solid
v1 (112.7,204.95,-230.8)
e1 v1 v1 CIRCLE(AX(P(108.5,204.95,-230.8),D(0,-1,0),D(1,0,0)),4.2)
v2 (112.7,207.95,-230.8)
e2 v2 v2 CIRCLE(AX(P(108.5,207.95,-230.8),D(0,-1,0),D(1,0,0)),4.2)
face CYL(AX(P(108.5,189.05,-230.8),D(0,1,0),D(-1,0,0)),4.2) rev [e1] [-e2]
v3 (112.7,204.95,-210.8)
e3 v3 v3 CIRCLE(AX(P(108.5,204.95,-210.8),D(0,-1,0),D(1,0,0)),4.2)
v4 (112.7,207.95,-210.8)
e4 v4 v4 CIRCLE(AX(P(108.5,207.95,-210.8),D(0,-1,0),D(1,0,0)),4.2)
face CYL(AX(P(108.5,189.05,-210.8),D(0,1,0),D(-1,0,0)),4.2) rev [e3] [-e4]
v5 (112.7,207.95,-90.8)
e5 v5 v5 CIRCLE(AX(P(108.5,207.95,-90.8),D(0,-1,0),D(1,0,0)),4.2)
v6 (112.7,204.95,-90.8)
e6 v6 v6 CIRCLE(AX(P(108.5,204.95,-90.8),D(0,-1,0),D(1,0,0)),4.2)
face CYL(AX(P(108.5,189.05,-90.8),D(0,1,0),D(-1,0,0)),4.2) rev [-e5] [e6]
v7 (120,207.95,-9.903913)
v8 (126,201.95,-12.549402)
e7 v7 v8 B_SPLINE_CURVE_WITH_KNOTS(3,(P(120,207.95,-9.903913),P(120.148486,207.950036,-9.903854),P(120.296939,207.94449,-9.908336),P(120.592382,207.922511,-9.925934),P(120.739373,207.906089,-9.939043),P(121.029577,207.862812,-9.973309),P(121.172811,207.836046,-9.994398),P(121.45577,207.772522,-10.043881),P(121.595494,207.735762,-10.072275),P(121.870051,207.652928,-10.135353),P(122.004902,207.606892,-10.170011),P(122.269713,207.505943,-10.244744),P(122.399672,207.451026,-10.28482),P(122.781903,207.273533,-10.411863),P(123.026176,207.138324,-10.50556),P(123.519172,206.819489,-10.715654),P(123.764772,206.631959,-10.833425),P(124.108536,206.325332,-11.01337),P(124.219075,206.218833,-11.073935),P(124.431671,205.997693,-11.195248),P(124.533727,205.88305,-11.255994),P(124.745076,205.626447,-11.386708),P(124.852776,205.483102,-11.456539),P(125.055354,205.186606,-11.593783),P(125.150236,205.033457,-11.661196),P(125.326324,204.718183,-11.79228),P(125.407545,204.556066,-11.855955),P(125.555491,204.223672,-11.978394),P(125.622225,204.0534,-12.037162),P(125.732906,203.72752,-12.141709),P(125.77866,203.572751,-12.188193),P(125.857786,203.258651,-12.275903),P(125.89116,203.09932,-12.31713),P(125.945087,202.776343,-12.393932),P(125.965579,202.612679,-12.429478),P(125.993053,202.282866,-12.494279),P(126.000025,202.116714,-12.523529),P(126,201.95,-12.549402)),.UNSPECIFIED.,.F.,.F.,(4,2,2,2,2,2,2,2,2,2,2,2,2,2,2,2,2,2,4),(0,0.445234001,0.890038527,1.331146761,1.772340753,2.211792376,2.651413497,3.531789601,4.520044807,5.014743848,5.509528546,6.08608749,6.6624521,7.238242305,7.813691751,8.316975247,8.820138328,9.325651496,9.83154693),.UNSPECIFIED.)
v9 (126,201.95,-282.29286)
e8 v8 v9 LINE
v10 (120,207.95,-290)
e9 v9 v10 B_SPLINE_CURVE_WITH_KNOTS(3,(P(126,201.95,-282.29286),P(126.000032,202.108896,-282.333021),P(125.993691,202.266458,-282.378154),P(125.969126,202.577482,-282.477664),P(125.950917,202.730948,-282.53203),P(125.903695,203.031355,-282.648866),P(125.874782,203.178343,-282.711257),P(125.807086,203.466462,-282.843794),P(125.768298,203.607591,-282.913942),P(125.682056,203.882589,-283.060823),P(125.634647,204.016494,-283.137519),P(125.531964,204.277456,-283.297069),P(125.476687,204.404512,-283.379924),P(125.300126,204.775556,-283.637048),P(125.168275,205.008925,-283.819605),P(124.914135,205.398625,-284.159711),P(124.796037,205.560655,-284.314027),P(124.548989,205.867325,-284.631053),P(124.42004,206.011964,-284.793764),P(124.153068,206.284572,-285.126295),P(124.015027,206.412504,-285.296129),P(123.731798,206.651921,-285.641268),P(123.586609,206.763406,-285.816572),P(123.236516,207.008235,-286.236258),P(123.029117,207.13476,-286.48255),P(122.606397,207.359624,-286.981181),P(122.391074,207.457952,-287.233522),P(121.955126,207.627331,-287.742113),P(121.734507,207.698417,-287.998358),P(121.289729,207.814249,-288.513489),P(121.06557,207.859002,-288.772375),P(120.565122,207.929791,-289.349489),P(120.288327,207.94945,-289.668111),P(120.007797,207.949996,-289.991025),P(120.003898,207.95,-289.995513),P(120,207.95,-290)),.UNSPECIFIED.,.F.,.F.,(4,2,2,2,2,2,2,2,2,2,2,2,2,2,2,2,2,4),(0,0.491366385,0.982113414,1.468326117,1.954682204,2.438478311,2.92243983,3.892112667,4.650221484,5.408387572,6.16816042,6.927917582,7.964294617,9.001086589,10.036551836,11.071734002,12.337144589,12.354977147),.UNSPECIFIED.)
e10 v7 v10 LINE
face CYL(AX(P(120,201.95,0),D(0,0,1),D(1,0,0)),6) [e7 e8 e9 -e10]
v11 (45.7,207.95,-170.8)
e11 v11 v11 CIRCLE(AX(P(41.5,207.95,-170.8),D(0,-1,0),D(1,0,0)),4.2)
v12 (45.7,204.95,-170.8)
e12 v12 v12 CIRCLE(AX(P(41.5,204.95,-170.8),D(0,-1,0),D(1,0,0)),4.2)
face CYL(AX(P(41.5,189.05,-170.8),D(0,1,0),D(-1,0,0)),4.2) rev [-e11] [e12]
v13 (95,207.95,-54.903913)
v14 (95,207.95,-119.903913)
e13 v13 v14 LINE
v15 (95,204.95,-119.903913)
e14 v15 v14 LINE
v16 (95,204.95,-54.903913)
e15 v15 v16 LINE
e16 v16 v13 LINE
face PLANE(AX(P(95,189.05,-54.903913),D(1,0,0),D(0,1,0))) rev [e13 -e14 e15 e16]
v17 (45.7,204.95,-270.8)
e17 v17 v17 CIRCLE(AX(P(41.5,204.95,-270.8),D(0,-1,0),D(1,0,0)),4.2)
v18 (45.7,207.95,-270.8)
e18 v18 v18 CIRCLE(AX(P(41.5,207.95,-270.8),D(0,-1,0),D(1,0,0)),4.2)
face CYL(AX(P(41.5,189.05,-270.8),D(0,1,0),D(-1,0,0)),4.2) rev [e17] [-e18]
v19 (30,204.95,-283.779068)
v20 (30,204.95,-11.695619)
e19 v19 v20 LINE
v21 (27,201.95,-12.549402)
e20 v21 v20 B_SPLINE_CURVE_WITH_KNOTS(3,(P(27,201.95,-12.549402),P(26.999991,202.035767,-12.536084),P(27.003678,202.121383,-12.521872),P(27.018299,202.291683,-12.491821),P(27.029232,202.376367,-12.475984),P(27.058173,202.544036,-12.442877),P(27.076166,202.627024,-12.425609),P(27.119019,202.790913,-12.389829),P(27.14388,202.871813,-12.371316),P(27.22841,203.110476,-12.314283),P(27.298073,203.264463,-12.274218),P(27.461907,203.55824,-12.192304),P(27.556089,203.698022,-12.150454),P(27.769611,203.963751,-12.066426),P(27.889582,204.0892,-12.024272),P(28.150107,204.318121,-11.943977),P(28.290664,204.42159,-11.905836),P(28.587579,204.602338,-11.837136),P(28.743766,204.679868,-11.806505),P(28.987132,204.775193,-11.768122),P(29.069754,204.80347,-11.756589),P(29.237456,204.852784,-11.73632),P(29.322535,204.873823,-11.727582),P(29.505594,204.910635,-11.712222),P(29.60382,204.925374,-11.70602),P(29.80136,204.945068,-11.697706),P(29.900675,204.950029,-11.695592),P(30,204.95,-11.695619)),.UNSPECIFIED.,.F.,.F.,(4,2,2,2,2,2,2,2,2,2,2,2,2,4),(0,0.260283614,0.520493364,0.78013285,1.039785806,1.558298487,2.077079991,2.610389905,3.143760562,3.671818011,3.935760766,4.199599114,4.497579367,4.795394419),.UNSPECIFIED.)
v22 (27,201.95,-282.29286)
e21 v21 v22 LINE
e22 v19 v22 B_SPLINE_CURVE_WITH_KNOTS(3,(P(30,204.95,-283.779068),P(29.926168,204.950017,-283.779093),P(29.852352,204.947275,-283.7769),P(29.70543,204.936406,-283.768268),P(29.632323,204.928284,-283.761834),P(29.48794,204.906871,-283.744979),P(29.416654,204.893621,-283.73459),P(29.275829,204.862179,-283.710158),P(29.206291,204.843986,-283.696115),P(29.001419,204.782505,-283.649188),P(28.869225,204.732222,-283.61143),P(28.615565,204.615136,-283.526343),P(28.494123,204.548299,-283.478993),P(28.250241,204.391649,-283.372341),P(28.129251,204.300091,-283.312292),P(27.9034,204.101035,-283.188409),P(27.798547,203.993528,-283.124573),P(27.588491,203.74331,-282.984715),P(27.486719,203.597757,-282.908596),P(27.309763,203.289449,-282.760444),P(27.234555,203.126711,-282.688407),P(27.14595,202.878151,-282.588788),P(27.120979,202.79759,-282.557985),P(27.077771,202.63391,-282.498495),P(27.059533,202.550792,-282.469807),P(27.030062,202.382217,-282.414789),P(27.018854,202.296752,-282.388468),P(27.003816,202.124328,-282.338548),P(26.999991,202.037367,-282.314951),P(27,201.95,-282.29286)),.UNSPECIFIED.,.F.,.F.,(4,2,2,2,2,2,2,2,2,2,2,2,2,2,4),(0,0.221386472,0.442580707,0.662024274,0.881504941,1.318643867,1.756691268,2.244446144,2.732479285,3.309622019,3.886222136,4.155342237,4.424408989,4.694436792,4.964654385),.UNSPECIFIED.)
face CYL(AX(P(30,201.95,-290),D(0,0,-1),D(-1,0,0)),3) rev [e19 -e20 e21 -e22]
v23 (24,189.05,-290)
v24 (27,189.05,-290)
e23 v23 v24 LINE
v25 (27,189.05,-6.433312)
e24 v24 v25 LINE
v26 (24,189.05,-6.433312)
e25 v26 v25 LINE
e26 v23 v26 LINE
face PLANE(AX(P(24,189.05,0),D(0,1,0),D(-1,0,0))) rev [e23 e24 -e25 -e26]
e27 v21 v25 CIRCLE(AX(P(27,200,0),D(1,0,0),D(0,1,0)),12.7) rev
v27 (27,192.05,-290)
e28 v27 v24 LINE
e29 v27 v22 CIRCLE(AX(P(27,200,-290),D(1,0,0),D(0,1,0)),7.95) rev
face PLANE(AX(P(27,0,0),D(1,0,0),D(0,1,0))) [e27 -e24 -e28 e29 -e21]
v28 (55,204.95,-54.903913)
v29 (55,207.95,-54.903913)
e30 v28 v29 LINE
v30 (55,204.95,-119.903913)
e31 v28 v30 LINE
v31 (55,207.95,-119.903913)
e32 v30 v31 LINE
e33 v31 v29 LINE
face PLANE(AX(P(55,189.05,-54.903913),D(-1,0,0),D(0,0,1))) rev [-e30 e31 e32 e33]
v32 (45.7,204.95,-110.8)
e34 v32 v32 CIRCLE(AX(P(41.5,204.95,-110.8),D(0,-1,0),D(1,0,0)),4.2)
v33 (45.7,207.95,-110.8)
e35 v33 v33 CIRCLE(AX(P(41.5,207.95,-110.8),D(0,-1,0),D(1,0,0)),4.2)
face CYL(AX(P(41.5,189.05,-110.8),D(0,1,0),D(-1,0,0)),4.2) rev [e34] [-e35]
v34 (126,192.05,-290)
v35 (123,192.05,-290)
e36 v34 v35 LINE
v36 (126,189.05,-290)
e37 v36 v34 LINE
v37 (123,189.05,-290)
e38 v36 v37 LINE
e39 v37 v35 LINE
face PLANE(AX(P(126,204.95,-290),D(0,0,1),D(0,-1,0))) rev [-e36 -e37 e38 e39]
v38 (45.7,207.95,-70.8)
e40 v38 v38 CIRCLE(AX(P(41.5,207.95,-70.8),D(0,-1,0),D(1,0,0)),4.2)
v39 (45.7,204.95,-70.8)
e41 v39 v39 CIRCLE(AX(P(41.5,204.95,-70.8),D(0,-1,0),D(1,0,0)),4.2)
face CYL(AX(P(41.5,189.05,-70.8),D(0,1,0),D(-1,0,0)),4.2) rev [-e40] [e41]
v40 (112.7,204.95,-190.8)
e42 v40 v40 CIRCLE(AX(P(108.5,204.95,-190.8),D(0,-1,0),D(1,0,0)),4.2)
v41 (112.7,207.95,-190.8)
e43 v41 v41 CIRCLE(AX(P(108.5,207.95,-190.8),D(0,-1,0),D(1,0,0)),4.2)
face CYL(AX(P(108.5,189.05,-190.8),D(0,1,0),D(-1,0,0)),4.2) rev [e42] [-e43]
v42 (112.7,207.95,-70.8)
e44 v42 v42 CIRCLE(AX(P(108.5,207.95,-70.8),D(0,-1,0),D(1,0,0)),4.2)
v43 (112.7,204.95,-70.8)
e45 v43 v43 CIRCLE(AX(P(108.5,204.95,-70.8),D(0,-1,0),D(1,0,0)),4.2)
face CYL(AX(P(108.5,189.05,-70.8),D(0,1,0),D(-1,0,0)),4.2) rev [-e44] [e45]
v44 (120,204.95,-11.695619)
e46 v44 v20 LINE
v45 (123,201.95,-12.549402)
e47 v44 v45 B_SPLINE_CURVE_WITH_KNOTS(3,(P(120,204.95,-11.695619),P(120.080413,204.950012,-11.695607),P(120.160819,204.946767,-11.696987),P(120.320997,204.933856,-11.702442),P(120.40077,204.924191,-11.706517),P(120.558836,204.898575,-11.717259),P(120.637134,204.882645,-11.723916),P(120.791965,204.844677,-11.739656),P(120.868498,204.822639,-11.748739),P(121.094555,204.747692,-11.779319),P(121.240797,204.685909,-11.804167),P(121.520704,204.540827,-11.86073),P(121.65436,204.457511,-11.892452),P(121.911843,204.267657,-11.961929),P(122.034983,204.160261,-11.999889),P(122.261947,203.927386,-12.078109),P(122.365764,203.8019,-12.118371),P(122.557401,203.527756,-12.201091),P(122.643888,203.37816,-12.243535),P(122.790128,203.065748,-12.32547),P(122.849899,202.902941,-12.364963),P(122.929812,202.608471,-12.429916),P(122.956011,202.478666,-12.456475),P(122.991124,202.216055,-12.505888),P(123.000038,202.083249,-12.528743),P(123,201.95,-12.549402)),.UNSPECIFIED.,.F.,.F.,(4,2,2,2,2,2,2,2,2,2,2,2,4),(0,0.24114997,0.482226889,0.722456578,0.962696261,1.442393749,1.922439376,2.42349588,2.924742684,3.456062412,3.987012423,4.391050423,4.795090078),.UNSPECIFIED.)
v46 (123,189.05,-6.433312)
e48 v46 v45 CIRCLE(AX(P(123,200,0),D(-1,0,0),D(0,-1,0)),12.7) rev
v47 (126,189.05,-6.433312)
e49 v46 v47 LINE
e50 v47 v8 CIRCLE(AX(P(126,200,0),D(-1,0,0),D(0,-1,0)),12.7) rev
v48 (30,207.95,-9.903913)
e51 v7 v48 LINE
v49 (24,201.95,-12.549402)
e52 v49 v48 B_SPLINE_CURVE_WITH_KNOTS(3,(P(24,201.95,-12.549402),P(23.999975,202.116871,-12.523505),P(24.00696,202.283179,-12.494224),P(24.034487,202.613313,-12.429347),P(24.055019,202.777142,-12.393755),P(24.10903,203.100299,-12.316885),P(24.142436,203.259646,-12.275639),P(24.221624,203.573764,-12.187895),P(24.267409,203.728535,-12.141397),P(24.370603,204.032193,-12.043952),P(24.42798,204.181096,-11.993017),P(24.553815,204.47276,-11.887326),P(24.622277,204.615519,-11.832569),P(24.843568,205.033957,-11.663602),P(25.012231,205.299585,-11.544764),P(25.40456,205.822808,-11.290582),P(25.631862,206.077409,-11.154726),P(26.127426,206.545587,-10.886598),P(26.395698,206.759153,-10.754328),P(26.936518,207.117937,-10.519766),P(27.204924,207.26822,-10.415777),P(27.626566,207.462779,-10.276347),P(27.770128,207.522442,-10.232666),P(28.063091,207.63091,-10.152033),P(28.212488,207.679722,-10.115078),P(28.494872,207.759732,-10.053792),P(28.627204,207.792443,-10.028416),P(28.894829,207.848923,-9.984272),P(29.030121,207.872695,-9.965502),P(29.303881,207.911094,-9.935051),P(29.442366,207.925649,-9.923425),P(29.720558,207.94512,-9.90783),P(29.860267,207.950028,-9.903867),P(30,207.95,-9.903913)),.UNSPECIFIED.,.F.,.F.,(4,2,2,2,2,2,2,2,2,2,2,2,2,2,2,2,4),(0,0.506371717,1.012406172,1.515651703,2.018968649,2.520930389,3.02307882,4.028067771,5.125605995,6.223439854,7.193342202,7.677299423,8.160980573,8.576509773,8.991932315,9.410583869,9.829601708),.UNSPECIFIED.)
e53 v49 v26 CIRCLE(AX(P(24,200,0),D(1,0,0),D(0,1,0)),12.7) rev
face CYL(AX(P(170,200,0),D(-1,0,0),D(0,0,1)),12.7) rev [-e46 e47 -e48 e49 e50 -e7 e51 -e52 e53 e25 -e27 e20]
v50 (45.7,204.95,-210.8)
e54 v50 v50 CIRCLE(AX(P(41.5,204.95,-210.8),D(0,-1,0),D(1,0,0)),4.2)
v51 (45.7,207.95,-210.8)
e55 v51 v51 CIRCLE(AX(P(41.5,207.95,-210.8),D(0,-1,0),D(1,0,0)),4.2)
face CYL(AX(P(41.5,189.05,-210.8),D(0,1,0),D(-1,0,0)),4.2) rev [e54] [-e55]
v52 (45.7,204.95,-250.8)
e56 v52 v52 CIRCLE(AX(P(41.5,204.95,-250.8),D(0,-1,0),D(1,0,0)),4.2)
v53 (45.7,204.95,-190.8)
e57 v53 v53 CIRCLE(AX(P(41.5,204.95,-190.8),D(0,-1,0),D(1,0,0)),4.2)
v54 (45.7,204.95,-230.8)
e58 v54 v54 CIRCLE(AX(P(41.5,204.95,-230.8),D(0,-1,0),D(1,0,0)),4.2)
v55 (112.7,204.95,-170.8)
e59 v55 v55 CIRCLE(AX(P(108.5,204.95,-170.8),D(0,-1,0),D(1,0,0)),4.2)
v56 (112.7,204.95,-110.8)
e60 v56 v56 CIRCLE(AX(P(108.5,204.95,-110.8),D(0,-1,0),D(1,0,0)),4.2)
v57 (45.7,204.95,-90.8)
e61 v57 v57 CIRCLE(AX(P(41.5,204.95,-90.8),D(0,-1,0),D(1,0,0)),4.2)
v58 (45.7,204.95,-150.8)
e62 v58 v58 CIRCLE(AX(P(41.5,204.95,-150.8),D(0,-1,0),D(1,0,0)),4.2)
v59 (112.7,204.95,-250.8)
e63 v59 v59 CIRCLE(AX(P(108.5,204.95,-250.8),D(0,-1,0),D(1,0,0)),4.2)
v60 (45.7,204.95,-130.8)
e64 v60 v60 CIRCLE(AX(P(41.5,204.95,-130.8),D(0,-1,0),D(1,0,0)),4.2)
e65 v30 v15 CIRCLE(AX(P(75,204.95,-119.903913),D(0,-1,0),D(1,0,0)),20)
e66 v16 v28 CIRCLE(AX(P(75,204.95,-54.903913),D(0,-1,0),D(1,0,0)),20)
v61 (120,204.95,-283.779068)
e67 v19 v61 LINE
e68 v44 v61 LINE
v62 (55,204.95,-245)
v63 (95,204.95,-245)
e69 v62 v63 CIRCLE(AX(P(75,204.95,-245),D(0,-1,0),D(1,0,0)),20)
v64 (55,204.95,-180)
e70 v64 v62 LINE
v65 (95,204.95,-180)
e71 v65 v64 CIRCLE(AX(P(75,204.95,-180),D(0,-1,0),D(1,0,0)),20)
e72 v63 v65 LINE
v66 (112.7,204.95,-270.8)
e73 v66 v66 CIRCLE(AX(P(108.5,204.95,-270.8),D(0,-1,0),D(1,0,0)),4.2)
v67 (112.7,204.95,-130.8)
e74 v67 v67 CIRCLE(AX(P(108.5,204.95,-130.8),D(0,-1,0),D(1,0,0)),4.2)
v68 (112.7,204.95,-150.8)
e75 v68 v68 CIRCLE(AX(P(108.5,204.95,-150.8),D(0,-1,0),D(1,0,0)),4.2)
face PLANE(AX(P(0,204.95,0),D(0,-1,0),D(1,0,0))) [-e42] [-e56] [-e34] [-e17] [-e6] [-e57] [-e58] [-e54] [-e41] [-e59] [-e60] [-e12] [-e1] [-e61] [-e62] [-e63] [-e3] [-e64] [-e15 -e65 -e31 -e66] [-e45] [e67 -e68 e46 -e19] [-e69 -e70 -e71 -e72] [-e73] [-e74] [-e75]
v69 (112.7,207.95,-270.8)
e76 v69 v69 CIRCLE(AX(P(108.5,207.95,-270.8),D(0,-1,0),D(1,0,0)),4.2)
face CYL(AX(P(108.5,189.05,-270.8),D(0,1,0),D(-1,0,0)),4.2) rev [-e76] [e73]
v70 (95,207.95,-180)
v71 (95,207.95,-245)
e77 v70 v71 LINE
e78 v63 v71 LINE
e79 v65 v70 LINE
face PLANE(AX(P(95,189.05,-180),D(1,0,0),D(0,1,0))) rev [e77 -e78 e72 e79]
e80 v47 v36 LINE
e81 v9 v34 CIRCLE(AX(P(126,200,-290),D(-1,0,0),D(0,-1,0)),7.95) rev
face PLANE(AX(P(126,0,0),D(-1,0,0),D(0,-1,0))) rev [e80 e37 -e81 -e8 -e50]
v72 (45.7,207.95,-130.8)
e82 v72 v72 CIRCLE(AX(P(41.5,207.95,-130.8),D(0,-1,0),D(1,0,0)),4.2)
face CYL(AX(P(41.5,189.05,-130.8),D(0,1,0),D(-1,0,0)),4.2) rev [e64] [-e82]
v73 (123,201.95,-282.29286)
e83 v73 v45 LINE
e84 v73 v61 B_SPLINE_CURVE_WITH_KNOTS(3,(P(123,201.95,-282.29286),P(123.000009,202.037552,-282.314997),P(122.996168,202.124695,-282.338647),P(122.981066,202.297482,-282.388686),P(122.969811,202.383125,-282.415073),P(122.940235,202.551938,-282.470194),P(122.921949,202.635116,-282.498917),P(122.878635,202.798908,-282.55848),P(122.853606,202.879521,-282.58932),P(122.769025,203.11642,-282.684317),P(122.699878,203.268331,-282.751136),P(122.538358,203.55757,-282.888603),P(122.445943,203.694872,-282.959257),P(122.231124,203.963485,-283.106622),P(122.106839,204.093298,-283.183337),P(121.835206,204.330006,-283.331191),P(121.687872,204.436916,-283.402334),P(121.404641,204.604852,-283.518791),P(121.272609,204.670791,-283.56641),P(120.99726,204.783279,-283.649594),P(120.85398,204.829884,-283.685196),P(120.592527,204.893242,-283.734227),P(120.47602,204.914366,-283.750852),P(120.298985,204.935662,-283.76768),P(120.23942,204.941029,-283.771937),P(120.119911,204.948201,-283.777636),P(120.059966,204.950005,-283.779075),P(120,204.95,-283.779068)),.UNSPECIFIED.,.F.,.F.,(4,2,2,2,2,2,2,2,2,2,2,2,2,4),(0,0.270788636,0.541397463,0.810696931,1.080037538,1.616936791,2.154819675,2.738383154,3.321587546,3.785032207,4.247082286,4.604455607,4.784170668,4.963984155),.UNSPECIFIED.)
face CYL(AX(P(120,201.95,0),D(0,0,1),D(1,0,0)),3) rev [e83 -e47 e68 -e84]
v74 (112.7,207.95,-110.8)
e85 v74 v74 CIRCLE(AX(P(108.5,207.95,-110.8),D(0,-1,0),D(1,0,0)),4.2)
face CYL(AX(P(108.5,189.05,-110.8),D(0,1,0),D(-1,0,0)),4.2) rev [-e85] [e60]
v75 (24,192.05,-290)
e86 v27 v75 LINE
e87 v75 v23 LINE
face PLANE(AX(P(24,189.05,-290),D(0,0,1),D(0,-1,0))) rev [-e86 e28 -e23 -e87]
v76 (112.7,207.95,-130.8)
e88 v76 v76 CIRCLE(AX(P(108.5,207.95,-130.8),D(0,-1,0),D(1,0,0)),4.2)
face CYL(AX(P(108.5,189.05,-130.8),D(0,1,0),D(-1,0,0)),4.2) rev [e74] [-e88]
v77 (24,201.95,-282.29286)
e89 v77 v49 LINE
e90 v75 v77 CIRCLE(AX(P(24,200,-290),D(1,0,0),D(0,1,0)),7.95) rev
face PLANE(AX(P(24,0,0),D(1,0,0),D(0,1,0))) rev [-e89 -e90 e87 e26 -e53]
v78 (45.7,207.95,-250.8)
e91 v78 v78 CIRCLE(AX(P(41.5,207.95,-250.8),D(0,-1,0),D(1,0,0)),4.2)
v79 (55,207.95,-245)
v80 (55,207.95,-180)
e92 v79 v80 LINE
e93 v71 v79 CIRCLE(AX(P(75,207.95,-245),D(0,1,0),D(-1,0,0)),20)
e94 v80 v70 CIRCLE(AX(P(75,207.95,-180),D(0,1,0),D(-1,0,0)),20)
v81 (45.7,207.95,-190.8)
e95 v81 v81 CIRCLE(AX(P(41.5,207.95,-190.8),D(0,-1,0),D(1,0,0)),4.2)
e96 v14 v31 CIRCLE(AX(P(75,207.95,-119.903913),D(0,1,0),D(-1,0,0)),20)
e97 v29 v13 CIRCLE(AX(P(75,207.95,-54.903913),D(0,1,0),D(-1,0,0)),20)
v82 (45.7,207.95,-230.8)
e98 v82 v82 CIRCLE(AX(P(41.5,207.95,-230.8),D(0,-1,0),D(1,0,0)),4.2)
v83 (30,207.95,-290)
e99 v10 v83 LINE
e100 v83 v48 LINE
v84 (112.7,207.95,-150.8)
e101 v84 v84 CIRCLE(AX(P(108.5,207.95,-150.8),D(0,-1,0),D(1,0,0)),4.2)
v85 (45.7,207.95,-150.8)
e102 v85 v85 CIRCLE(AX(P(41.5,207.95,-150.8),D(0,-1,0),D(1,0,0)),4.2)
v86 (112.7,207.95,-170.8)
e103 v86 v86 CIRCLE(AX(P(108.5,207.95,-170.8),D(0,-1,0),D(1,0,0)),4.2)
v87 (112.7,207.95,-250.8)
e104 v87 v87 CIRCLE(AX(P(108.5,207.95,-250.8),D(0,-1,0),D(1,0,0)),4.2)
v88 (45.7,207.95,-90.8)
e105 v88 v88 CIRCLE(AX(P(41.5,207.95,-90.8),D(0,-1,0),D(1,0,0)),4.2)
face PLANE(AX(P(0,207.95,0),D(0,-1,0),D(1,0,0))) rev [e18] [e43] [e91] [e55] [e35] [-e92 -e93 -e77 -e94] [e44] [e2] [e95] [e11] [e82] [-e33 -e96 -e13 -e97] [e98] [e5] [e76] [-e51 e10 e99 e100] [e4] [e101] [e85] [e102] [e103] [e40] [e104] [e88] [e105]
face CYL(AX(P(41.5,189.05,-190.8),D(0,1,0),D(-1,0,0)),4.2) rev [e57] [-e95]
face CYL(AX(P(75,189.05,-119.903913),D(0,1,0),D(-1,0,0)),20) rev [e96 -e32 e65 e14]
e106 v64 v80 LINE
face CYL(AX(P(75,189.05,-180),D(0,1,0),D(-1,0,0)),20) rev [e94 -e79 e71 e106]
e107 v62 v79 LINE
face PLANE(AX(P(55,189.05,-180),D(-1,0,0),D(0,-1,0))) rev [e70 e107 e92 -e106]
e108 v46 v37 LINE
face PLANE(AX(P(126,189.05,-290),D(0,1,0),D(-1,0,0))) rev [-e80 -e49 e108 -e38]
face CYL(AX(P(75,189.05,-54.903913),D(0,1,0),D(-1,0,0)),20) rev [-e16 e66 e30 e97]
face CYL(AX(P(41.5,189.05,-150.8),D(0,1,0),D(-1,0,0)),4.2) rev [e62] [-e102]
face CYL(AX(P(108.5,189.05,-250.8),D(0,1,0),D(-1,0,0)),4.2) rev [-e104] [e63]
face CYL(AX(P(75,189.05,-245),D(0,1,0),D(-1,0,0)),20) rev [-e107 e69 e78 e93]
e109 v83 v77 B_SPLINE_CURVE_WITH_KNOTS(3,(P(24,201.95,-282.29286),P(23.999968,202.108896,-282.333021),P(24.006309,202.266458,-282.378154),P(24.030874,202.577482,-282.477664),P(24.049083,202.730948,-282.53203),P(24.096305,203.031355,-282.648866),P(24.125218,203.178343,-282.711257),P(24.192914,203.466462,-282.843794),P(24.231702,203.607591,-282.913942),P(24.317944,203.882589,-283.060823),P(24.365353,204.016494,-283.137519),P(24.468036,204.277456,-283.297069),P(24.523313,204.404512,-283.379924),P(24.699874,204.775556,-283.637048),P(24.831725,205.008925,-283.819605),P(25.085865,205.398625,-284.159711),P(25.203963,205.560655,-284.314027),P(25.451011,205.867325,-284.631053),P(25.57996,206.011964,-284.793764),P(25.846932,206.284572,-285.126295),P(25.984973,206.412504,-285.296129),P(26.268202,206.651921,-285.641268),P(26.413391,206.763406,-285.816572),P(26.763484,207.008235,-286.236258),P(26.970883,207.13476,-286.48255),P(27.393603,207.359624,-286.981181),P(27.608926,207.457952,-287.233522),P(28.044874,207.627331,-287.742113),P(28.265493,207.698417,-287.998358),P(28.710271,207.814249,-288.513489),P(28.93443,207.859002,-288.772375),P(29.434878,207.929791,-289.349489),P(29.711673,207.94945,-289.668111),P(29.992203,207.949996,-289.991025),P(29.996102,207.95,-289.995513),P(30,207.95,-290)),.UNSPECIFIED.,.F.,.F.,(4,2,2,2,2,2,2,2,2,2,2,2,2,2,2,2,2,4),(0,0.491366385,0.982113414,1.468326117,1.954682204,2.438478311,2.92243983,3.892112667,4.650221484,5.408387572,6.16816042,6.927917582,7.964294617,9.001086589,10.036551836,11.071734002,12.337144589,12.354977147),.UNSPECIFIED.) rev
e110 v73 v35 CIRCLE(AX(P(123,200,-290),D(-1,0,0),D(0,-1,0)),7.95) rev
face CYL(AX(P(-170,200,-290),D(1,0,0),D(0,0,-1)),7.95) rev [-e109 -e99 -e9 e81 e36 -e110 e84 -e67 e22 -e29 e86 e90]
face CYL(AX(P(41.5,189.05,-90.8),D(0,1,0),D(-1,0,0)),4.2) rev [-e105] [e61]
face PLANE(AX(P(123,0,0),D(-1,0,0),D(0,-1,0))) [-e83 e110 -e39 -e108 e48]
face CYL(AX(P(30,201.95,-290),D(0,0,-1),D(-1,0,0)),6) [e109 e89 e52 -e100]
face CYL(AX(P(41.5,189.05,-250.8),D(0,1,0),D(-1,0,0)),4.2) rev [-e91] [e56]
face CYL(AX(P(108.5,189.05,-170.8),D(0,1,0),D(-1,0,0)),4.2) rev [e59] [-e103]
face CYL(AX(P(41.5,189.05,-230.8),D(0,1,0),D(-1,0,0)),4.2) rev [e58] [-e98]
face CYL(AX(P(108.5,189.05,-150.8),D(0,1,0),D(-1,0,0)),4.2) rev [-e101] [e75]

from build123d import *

# Parameters (mm, degrees)
SKETCH1_W                   = 90
SKETCH1_H                   = 290
BASE_FLANGE1_DEPTH          = 3
SM_EDGE_FLANGE_1_DEPTH      = 290
SM_EDGE_FLANGE_1_BEND_DEPTH = 290
INDENT1_START               = 23
INDENT1_DEPTH               = 104
INDENT1_START_2             = 26.270388893
INDENT1_2_DEPTH             = 97.459222009
INDENT1_3_DEPTH             = 0.729611107
INDENT1_START_3             = 123
INDENT1_4_DEPTH             = 0.729610902
INDENT1_START_4             = 119.9999999
INDENT1_5_DEPTH             = 6.0000001
INDENT1_START_5             = 24
INDENT1_6_DEPTH             = 6
INDENT1_START_6             = -290
INDENT1_7_DEPTH             = 6.65
INDENT2_START               = 23
INDENT2_DEPTH               = 104
INDENT2_START_2             = -11.0000001
INDENT2_2_DEPTH             = 11.0000001
INDENT2_START_3             = 24
INDENT2_3_DEPTH             = 102
CUT_EXTRUDE1_DEPTH          = 317.754179273
CUT_EXTRUDE1_DEPTH_BACK     = 317.754179273
SKETCH15_R                  = 4.2
CUT_EXTRUDE2_DEPTH          = 317.754179273
CUT_EXTRUDE2_DEPTH_BACK     = 317.754179273


with BuildPart() as part:
    # Base-Flange1: sheet metal written as solids
    # Sketch1 → Base-Flange1 (new body)
    with BuildSketch(Plane(origin=(0, 207.95, 0), x_dir=(1, 0, 0), z_dir=(0, 1, 0))):
        with Locations((75, 145)):
            Rectangle(SKETCH1_W, SKETCH1_H)
    extrude(amount=-BASE_FLANGE1_DEPTH)

    # 邊線-凸緣1: sheet metal written as solids
    # 邊線-凸緣1 section (on a plane across the edge) → 邊線-凸緣1 (add)
    with BuildSketch(Plane(origin=(27, 204.95, 0), x_dir=(1, 0, 0), z_dir=(0, 0, -1))):
        with BuildLine():
            Line((-3, 3), (-3, 15.9))
            Line((-3, 15.9), (0, 15.9))
            Line((0, 15.9), (0, 3))
            ThreePointArc((0, 3), (0.878679656, 0.878679656), (3, 0))
            Line((3, 0), (3, -3))
            ThreePointArc((3, -3), (-1.242640687, -1.242640687), (-3, 3))
        make_face()
    extrude(amount=SM_EDGE_FLANGE_1_DEPTH)

    # 邊線-凸緣1 section 2 (on a plane across the edge) → 邊線-凸緣1 bend (add)
    with BuildSketch(Plane(origin=(123, 204.95, -290), x_dir=(-1, 0, 0), z_dir=(0, 0, 1))):
        with BuildLine():
            Line((-3, 3), (-3, 15.9))
            Line((-3, 15.9), (0, 15.9))
            Line((0, 15.9), (0, 3))
            ThreePointArc((0, 3), (0.878679656, 0.878679656), (3, 0))
            Line((3, 0), (3, -3))
            ThreePointArc((3, -3), (-1.242640687, -1.242640687), (-3, 3))
        make_face()
    extrude(amount=SM_EDGE_FLANGE_1_BEND_DEPTH)

    # Indent1: read off the stored shape, not the designer's step
    # Indent1 outline → Indent1 (cut)
    with BuildSketch(Plane.YZ.offset(INDENT1_START)):
        with BuildLine():
            Line((192.05, -290), (207.95, -290))
            ThreePointArc((207.95, -290), (200, -282.05), (192.05, -290))
        make_face()
    extrude(amount=INDENT1_DEPTH, mode=Mode.SUBTRACT)

    # Indent2: read off the stored shape, not the designer's step
    # Indent2 outline → Indent2 (cut)
    with BuildSketch(Plane.YZ.offset(INDENT2_START)):
        with BuildLine():
            ThreePointArc((189.05, -6.433311744), (197.7062633, -12.491147744), (207.950014124, -9.903902031))
            Line((207.950014124, -9.903902031), (209, -9.061062257))
            Line((209, -9.061062257), (209, 1))
            Line((209, 1), (188, 1))
            Line((188, 1), (188, 0))
            Line((188, 0), (188, -4.64612958))
            Line((188, -4.64612958), (189.05, -6.433311744))
        make_face()
    extrude(amount=INDENT2_DEPTH, mode=Mode.SUBTRACT)

    # Sketch15 → Cut-Extrude1 (cut, two sides: drawn at the far end of the back side and taken through both)
    with BuildSketch(Plane(origin=(0, 207.95, 0), x_dir=(1, 0, 0), z_dir=(0, 1, 0)).offset(-CUT_EXTRUDE1_DEPTH_BACK)):
        with Locations((41.5, 270.8)):
            Circle(SKETCH15_R)
        with Locations((108.5, 270.8)):
            Circle(SKETCH15_R)
        with Locations((41.5, 250.8)):
            Circle(SKETCH15_R)
        with Locations((108.5, 250.8)):
            Circle(SKETCH15_R)
        with Locations((41.5, 230.8)):
            Circle(SKETCH15_R)
        with Locations((108.5, 230.8)):
            Circle(SKETCH15_R)
        with Locations((41.5, 210.8)):
            Circle(SKETCH15_R)
        with Locations((108.5, 210.8)):
            Circle(SKETCH15_R)
        with Locations((41.5, 190.8)):
            Circle(SKETCH15_R)
        with Locations((108.5, 190.8)):
            Circle(SKETCH15_R)
        with Locations((41.5, 170.8)):
            Circle(SKETCH15_R)
        with Locations((108.5, 170.8)):
            Circle(SKETCH15_R)
        with Locations((41.5, 150.8)):
            Circle(SKETCH15_R)
        with Locations((108.5, 150.8)):
            Circle(SKETCH15_R)
        with Locations((41.5, 130.8)):
            Circle(SKETCH15_R)
        with Locations((108.5, 130.8)):
            Circle(SKETCH15_R)
        with Locations((41.5, 110.8)):
            Circle(SKETCH15_R)
        with Locations((108.5, 110.8)):
            Circle(SKETCH15_R)
        with Locations((41.5, 90.8)):
            Circle(SKETCH15_R)
        with Locations((108.5, 90.8)):
            Circle(SKETCH15_R)
        with Locations((41.5, 70.8)):
            Circle(SKETCH15_R)
        with Locations((108.5, 70.8)):
            Circle(SKETCH15_R)
    extrude(amount=CUT_EXTRUDE1_DEPTH + CUT_EXTRUDE1_DEPTH_BACK, mode=Mode.SUBTRACT)

    # Sketch16 → Cut-Extrude2 (cut, two sides: drawn at the far end of the back side and taken through both)
    with BuildSketch(Plane(origin=(0, 207.95, 0), x_dir=(1, 0, 0), z_dir=(0, 1, 0)).offset(-CUT_EXTRUDE2_DEPTH_BACK)):
        with BuildLine():
            Line((55, 54.903913368), (55, 119.903913368))
            ThreePointArc((55, 119.903913368), (75, 139.903913368), (95, 119.903913368))
            Line((95, 119.903913368), (95, 54.903913368))
            ThreePointArc((95, 54.903913368), (75, 34.903913368), (55, 54.903913368))
        make_face()
        with BuildLine():
            Line((55, 180), (55, 245))
            ThreePointArc((55, 245), (75, 265), (95, 245))
            Line((95, 245), (95, 180))
            ThreePointArc((95, 180), (75, 160), (55, 180))
        make_face()
    extrude(amount=CUT_EXTRUDE2_DEPTH + CUT_EXTRUDE2_DEPTH_BACK, mode=Mode.SUBTRACT)


with BuildPart() as body_2:
    # Indent1 2 outline → Indent1 2 (new body)
    with BuildSketch(Plane.YZ.offset(INDENT1_START_2)):
        with BuildLine():
            Line((204.95, -285.559279338), (204.95, -290))
            Line((204.95, -290), (206.65, -290))
            ThreePointArc((206.65, -290), (206.210475022, -287.622501314), (204.95, -285.559279338))
        make_face()
    extrude(amount=INDENT1_2_DEPTH)

    # Indent1 3 outline → Indent1 3 (add)
    with BuildSketch(Plane.YZ.offset(INDENT1_START_2)):
        with BuildLine():
            Line((193.35, -290), (204.95, -290))
            Line((204.95, -290), (204.95, -285.559279338))
            ThreePointArc((204.95, -285.559279338), (197.622501314, -283.789524978), (193.35, -290))
        make_face()
    extrude(amount=INDENT1_3_DEPTH)

    # Indent1 4 outline → Indent1 4 (add)
    with BuildSketch(Plane.YZ.offset(INDENT1_START_3)):
        with BuildLine():
            Line((193.35, -290), (204.95, -290))
            Line((204.95, -290), (204.95, -285.559279338))
            ThreePointArc((204.95, -285.559279338), (197.622501314, -283.789524978), (193.35, -290))
        make_face()
    extrude(amount=INDENT1_4_DEPTH)

    # Indent1 5 outline → Indent1 5 (add)
    with BuildSketch(Plane.YZ.offset(INDENT1_START_4)):
        with BuildLine():
            Line((193.35, -290), (206.65, -290))
            ThreePointArc((206.65, -290), (200, -283.35), (193.35, -290))
        make_face()
    extrude(amount=INDENT1_5_DEPTH)

    # Indent1 6 outline → Indent1 6 (add)
    with BuildSketch(Plane.YZ.offset(INDENT1_START_5)):
        with BuildLine():
            Line((193.35, -290), (206.65, -290))
            ThreePointArc((206.65, -290), (200, -283.35), (193.35, -290))
        make_face()
    extrude(amount=INDENT1_6_DEPTH)

    # Indent1 7 outline → Indent1 7 (cut)
    with BuildSketch(Plane.XY.offset(INDENT1_START_6)):
        with BuildLine():
            Line((123, 192), (123, 201.95))
            ThreePointArc((123, 201.95), (122.121320344, 204.071320344), (120, 204.95))
            Line((120, 204.95), (119.9999999, 192))
            Line((119.9999999, 192), (123, 192))
        make_face()
        with BuildLine():
            Line((27, 192), (30, 192))
            Line((30, 192), (30, 204.95))
            ThreePointArc((30, 204.95), (27.878679656, 204.071320344), (27, 201.95))
            Line((27, 201.95), (27, 192))
        make_face()
        with BuildLine():
            ThreePointArc((123.729603466, 206.650006169), (125.402666971, 204.559825589), (126, 201.95))
            Line((126, 201.95), (126, 208))
            Line((126, 208), (122.028355761, 208))
            Line((122.028355761, 208), (123.729603466, 206.650006169))
        make_face()
        with BuildLine():
            Line((24, 208), (24, 201.95))
            ThreePointArc((24, 201.95), (24.597331636, 204.559822705), (26.270391517, 206.650002187))
            Line((26.270391517, 206.650002187), (27.971640511, 208))
            Line((27.971640511, 208), (24, 208))
        make_face()
    extrude(amount=INDENT1_7_DEPTH, mode=Mode.SUBTRACT)


with BuildPart() as body_3:
    # Indent2 2 outline → Indent2 2 (new body)
    with BuildSketch(Plane.XY.offset(INDENT2_START_2)):
        with BuildLine():
            Line((24, 201.95), (24, 189.05))
            Line((24, 189.05), (27, 189.05))
            Line((27, 189.05), (27, 201.95))
            ThreePointArc((27, 201.95), (27.878679656, 204.071320344), (30, 204.95))
            Line((30, 204.95), (120, 204.95))
            ThreePointArc((120, 204.95), (122.121320344, 204.071320344), (123, 201.95))
            Line((123, 201.95), (123, 189.05))
            Line((123, 189.05), (126, 189.05))
            Line((126, 189.05), (126, 201.95))
            ThreePointArc((126, 201.95), (124.242640687, 206.192640687), (120, 207.95))
            Line((120, 207.95), (30, 207.95))
            ThreePointArc((30, 207.95), (25.757359313, 206.192640687), (24, 201.95))
        make_face()
    extrude(amount=INDENT2_2_DEPTH)

    # Indent2 3 outline → Indent2 3 (cut)
    with BuildSketch(Plane.YZ.offset(INDENT2_START_3)):
        with BuildLine():
            Line((207.95, -11.0000001), (207.950016725, -7.602449216))
            ThreePointArc((207.950016725, -7.602449216), (204.322791843, -10.115012145), (200.000000001, -11))
            Line((200.000000001, -11), (207.95, -11.0000001))
        make_face()
        with BuildLine():
            Line((189.05, -11.0000001), (200.000000001, -11))
            ThreePointArc((200.000000001, -11), (192.601479194, -8.140140655), (189.05, -1.047616342))
            Line((189.05, -1.047616342), (189.05, -11.0000001))
        make_face()
    extrude(amount=INDENT2_3_DEPTH, mode=Mode.SUBTRACT)


solid = part.part
